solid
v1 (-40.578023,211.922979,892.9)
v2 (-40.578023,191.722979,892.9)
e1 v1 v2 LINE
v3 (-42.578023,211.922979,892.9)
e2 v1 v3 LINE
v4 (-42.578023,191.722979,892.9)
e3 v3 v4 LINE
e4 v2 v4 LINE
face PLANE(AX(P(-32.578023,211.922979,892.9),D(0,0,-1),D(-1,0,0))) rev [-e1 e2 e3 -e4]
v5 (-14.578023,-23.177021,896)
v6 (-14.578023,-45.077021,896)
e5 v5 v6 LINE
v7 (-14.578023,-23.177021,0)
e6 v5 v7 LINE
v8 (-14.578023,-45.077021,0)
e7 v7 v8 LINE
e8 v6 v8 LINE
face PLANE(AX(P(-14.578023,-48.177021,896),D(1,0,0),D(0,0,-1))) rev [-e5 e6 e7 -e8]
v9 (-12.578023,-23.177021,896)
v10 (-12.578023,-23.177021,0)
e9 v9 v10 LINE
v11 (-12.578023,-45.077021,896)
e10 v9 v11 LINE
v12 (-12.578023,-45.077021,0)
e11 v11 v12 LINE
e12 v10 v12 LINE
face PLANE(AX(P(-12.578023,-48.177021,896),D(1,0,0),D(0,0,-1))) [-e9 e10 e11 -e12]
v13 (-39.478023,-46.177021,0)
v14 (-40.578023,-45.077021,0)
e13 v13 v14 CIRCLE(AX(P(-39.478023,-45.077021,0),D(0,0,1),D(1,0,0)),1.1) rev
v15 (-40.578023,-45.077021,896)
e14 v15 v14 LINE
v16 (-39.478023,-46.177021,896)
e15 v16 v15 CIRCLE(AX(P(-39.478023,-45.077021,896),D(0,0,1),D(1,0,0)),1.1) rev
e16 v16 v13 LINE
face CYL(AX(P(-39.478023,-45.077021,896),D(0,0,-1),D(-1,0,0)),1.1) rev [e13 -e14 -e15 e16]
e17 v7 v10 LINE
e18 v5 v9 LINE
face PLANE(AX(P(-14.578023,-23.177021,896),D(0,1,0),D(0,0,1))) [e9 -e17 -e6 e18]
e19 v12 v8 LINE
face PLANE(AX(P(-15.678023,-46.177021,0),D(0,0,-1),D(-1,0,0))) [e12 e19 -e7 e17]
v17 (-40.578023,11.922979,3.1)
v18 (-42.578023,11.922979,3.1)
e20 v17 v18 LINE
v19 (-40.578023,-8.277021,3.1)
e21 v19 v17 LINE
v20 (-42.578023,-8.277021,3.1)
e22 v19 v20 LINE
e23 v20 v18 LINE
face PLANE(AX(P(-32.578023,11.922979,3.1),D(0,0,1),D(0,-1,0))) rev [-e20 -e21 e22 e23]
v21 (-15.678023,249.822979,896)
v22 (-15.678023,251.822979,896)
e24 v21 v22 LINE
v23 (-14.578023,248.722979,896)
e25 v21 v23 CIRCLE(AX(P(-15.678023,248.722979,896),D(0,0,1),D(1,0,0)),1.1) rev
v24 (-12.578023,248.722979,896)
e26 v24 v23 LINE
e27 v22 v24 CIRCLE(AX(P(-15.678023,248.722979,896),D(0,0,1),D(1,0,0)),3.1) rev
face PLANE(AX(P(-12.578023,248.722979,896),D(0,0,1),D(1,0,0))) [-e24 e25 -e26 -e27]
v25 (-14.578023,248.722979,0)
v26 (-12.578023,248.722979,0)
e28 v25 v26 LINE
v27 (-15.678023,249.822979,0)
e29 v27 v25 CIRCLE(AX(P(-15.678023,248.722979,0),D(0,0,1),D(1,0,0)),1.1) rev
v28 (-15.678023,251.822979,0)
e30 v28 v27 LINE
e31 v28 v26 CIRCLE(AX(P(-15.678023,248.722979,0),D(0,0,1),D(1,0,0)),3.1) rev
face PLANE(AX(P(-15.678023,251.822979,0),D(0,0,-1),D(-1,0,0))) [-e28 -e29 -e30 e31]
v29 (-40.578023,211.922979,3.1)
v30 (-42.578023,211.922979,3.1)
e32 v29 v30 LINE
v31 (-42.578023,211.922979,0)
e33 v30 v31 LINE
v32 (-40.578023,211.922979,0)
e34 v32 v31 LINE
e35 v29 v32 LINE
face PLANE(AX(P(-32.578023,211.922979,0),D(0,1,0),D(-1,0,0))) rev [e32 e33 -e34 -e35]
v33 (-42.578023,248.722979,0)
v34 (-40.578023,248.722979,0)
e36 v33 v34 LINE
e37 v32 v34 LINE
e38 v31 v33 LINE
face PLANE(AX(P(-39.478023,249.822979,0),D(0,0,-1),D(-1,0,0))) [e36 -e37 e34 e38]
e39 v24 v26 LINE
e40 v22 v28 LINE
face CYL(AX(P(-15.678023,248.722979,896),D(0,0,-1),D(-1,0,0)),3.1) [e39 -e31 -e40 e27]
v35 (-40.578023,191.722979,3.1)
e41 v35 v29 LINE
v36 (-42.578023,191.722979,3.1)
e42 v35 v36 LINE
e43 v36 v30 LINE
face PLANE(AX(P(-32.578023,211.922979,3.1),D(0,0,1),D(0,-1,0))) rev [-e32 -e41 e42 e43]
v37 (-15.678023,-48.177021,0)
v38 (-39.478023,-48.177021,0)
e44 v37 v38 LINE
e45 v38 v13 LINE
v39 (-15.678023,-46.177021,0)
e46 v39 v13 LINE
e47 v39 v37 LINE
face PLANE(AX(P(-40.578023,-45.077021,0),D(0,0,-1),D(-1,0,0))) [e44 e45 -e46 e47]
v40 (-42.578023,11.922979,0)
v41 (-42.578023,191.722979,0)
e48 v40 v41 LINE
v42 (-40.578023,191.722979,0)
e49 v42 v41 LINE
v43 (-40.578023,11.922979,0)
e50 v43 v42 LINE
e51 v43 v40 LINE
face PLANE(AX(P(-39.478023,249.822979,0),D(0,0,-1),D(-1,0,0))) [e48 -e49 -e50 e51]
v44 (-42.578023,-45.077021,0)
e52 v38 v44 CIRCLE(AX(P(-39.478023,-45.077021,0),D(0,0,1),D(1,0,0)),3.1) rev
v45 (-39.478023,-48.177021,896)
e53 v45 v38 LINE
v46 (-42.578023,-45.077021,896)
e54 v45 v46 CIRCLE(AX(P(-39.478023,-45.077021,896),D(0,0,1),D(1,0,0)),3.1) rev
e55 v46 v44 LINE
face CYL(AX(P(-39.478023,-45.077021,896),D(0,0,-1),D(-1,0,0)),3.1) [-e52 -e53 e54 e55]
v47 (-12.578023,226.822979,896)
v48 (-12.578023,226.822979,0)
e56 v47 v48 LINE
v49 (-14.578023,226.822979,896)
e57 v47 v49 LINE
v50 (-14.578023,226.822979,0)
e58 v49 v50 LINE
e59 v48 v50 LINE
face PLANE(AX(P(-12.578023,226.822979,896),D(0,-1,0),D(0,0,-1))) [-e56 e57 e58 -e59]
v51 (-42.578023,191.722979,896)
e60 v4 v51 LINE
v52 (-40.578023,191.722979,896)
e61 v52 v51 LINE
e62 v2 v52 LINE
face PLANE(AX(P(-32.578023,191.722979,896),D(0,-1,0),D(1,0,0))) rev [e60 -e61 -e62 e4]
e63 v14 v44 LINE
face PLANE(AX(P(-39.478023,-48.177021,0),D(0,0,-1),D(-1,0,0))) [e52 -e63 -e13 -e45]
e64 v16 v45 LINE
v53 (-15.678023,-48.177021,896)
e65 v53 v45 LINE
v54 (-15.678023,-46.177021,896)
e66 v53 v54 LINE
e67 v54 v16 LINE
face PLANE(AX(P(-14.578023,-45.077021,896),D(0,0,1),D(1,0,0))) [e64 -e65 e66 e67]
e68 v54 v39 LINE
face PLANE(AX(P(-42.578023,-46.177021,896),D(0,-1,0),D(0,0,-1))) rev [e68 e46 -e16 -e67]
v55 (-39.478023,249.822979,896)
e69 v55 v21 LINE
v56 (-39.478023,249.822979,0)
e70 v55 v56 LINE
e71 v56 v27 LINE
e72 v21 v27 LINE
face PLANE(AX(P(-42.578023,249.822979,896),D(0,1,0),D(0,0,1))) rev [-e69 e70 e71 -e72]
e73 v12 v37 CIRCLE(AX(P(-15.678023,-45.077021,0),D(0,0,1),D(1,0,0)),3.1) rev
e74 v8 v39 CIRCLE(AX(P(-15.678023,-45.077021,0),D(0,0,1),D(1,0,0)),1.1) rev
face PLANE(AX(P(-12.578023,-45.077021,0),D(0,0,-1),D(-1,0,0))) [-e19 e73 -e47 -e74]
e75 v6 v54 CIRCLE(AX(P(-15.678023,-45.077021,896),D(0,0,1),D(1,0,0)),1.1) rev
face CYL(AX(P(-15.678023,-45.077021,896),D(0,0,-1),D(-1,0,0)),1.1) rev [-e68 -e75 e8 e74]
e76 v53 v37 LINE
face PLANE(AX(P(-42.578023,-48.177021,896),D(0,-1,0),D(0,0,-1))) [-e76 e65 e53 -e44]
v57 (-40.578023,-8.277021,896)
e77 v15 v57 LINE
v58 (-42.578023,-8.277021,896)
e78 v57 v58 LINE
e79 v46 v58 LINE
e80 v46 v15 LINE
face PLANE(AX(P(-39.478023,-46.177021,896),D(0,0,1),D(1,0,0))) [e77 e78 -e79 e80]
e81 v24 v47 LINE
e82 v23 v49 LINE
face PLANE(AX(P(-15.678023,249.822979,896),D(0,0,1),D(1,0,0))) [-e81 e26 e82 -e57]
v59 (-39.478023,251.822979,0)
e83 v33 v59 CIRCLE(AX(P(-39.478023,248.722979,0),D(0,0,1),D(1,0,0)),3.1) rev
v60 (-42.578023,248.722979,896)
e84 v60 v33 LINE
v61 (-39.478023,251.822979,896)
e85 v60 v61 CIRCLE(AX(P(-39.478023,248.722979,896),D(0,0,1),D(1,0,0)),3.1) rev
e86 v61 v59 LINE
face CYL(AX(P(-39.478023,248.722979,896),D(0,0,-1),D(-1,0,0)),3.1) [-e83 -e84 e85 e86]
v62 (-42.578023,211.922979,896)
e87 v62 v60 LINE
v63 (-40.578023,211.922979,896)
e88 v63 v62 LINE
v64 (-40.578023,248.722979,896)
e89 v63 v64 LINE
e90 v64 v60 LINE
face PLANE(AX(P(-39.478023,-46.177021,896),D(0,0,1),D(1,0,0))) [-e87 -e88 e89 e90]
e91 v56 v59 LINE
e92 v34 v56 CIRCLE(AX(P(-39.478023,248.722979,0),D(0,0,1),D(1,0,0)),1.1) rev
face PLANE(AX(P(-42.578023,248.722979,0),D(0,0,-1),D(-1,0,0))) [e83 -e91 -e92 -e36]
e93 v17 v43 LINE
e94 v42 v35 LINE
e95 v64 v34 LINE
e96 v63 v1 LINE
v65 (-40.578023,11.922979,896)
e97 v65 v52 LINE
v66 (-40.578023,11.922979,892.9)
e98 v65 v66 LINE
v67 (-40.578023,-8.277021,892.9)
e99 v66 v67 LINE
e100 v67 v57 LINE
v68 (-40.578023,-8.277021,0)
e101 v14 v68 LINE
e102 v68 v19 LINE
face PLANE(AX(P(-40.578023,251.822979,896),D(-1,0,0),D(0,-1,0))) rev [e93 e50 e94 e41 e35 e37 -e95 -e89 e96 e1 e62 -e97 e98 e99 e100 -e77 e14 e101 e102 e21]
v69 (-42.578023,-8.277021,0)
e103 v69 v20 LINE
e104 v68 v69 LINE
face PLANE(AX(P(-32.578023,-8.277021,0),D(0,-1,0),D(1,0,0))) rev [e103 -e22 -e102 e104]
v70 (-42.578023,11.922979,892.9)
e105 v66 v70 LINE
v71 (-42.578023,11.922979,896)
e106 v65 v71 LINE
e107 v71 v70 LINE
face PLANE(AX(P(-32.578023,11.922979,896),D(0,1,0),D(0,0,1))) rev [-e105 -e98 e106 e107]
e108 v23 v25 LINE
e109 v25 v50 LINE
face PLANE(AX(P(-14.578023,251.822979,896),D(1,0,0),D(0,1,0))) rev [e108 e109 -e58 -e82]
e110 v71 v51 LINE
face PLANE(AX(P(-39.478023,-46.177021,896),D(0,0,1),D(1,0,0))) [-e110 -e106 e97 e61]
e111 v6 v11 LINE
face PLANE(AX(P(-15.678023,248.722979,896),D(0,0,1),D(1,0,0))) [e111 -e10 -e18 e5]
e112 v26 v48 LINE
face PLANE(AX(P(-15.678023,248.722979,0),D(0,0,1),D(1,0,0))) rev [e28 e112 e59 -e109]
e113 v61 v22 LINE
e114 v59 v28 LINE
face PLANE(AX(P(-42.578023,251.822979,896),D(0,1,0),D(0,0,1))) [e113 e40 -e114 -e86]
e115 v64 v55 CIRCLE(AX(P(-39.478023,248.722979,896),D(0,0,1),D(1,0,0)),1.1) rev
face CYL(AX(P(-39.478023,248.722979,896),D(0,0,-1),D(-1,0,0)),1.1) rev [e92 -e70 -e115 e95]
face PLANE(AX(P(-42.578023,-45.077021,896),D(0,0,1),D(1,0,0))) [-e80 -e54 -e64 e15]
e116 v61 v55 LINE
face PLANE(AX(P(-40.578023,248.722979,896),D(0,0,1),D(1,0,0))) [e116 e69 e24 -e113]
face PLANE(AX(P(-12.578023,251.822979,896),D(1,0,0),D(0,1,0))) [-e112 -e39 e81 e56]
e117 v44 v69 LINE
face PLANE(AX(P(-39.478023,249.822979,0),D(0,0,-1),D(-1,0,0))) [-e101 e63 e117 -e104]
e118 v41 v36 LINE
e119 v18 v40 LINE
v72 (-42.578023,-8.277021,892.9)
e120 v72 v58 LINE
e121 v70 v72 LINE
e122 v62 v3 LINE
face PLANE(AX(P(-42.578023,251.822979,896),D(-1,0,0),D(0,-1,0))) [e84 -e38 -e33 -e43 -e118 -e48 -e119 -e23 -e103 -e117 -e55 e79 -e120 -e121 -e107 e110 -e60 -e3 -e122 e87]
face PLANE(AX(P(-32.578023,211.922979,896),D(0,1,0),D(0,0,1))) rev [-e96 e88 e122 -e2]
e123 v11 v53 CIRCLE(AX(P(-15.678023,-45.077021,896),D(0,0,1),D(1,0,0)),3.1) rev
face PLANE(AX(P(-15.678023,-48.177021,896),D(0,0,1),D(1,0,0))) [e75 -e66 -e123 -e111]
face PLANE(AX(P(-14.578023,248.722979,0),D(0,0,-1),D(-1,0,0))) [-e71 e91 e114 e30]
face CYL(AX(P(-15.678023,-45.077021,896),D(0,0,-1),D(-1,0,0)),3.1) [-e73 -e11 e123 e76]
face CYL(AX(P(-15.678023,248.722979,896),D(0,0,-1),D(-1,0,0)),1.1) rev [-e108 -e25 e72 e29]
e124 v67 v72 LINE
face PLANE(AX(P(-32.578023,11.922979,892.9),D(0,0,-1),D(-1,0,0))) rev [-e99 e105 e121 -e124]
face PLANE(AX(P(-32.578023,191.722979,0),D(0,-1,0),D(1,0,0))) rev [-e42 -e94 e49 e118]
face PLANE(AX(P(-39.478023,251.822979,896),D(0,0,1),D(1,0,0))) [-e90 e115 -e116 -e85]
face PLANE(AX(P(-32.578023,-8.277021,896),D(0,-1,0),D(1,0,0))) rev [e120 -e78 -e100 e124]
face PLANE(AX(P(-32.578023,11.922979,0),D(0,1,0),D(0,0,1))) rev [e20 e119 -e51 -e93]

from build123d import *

# Parameters (mm, degrees)
SM_BASE_FLANGE_1_DEPTH = 896
SKETCH_4_W             = 3.1
SKETCH_4_H             = 20.2
CUT_EXTRUDE_1_DEPTH    = 10


# Sheet-metal steps are written as plain solids
with BuildPart() as part:
    # Sketch 1 → Базовая кромка1 (new body)
    with BuildSketch(Plane.XY):
        with BuildLine():
            Line((-12.578023183, 226.822978959), (-12.578023183, 248.722978959))
            ThreePointArc((-12.578023183, 248.722978959), (-13.485992161, 250.915009981), (-15.678023183, 251.822978959))
            Line((-15.678023183, 251.822978959), (-39.478023183, 251.822978959))
            ThreePointArc((-39.478023183, 251.822978959), (-41.670054205, 250.915009981), (-42.578023183, 248.722978959))
            Line((-42.578023183, 248.722978959), (-42.578023183, -45.077021041))
            ThreePointArc((-42.578023183, -45.077021041), (-41.670054205, -47.269052063), (-39.478023183, -48.177021041))
            Line((-39.478023183, -48.177021041), (-15.678023183, -48.177021041))
            ThreePointArc((-15.678023183, -48.177021041), (-13.485992161, -47.269052063), (-12.578023183, -45.077021041))
            Line((-12.578023183, -45.077021041), (-12.578023183, -23.177021041))
            Line((-12.578023183, -23.177021041), (-14.578023183, -23.177021041))
            Line((-14.578023183, -23.177021041), (-14.578023183, -45.077021041))
            ThreePointArc((-14.578023183, -45.077021041), (-14.900205724, -45.8548385), (-15.678023183, -46.177021041))
            Line((-15.678023183, -46.177021041), (-39.478023183, -46.177021041))
            ThreePointArc((-39.478023183, -46.177021041), (-40.255840642, -45.8548385), (-40.578023183, -45.077021041))
            Line((-40.578023183, -45.077021041), (-40.578023183, 248.722978959))
            ThreePointArc((-40.578023183, 248.722978959), (-40.255840642, 249.500796418), (-39.478023183, 249.822978959))
            Line((-39.478023183, 249.822978959), (-15.678023183, 249.822978959))
            ThreePointArc((-15.678023183, 249.822978959), (-14.900205724, 249.500796418), (-14.578023183, 248.722978959))
            Line((-14.578023183, 248.722978959), (-14.578023183, 226.822978959))
            Line((-14.578023183, 226.822978959), (-12.578023183, 226.822978959))
        make_face()
    extrude(amount=SM_BASE_FLANGE_1_DEPTH)

    # Эскиз4 → Вырез-Вытянуть1 (cut)
    with BuildSketch(Plane.ZY.offset(42.578023183)):
        with Locations((1.55, 201.822978959)):
            Rectangle(SKETCH_4_W, SKETCH_4_H)
        with Locations((1.55, 1.822978959)):
            Rectangle(SKETCH_4_W, SKETCH_4_H)
        with Locations((894.45, 201.822978959)):
            Rectangle(SKETCH_4_W, SKETCH_4_H)
        with Locations((894.45, 1.822978959)):
            Rectangle(SKETCH_4_W, SKETCH_4_H)
    extrude(amount=-CUT_EXTRUDE_1_DEPTH, mode=Mode.SUBTRACT)


solid = part.part
